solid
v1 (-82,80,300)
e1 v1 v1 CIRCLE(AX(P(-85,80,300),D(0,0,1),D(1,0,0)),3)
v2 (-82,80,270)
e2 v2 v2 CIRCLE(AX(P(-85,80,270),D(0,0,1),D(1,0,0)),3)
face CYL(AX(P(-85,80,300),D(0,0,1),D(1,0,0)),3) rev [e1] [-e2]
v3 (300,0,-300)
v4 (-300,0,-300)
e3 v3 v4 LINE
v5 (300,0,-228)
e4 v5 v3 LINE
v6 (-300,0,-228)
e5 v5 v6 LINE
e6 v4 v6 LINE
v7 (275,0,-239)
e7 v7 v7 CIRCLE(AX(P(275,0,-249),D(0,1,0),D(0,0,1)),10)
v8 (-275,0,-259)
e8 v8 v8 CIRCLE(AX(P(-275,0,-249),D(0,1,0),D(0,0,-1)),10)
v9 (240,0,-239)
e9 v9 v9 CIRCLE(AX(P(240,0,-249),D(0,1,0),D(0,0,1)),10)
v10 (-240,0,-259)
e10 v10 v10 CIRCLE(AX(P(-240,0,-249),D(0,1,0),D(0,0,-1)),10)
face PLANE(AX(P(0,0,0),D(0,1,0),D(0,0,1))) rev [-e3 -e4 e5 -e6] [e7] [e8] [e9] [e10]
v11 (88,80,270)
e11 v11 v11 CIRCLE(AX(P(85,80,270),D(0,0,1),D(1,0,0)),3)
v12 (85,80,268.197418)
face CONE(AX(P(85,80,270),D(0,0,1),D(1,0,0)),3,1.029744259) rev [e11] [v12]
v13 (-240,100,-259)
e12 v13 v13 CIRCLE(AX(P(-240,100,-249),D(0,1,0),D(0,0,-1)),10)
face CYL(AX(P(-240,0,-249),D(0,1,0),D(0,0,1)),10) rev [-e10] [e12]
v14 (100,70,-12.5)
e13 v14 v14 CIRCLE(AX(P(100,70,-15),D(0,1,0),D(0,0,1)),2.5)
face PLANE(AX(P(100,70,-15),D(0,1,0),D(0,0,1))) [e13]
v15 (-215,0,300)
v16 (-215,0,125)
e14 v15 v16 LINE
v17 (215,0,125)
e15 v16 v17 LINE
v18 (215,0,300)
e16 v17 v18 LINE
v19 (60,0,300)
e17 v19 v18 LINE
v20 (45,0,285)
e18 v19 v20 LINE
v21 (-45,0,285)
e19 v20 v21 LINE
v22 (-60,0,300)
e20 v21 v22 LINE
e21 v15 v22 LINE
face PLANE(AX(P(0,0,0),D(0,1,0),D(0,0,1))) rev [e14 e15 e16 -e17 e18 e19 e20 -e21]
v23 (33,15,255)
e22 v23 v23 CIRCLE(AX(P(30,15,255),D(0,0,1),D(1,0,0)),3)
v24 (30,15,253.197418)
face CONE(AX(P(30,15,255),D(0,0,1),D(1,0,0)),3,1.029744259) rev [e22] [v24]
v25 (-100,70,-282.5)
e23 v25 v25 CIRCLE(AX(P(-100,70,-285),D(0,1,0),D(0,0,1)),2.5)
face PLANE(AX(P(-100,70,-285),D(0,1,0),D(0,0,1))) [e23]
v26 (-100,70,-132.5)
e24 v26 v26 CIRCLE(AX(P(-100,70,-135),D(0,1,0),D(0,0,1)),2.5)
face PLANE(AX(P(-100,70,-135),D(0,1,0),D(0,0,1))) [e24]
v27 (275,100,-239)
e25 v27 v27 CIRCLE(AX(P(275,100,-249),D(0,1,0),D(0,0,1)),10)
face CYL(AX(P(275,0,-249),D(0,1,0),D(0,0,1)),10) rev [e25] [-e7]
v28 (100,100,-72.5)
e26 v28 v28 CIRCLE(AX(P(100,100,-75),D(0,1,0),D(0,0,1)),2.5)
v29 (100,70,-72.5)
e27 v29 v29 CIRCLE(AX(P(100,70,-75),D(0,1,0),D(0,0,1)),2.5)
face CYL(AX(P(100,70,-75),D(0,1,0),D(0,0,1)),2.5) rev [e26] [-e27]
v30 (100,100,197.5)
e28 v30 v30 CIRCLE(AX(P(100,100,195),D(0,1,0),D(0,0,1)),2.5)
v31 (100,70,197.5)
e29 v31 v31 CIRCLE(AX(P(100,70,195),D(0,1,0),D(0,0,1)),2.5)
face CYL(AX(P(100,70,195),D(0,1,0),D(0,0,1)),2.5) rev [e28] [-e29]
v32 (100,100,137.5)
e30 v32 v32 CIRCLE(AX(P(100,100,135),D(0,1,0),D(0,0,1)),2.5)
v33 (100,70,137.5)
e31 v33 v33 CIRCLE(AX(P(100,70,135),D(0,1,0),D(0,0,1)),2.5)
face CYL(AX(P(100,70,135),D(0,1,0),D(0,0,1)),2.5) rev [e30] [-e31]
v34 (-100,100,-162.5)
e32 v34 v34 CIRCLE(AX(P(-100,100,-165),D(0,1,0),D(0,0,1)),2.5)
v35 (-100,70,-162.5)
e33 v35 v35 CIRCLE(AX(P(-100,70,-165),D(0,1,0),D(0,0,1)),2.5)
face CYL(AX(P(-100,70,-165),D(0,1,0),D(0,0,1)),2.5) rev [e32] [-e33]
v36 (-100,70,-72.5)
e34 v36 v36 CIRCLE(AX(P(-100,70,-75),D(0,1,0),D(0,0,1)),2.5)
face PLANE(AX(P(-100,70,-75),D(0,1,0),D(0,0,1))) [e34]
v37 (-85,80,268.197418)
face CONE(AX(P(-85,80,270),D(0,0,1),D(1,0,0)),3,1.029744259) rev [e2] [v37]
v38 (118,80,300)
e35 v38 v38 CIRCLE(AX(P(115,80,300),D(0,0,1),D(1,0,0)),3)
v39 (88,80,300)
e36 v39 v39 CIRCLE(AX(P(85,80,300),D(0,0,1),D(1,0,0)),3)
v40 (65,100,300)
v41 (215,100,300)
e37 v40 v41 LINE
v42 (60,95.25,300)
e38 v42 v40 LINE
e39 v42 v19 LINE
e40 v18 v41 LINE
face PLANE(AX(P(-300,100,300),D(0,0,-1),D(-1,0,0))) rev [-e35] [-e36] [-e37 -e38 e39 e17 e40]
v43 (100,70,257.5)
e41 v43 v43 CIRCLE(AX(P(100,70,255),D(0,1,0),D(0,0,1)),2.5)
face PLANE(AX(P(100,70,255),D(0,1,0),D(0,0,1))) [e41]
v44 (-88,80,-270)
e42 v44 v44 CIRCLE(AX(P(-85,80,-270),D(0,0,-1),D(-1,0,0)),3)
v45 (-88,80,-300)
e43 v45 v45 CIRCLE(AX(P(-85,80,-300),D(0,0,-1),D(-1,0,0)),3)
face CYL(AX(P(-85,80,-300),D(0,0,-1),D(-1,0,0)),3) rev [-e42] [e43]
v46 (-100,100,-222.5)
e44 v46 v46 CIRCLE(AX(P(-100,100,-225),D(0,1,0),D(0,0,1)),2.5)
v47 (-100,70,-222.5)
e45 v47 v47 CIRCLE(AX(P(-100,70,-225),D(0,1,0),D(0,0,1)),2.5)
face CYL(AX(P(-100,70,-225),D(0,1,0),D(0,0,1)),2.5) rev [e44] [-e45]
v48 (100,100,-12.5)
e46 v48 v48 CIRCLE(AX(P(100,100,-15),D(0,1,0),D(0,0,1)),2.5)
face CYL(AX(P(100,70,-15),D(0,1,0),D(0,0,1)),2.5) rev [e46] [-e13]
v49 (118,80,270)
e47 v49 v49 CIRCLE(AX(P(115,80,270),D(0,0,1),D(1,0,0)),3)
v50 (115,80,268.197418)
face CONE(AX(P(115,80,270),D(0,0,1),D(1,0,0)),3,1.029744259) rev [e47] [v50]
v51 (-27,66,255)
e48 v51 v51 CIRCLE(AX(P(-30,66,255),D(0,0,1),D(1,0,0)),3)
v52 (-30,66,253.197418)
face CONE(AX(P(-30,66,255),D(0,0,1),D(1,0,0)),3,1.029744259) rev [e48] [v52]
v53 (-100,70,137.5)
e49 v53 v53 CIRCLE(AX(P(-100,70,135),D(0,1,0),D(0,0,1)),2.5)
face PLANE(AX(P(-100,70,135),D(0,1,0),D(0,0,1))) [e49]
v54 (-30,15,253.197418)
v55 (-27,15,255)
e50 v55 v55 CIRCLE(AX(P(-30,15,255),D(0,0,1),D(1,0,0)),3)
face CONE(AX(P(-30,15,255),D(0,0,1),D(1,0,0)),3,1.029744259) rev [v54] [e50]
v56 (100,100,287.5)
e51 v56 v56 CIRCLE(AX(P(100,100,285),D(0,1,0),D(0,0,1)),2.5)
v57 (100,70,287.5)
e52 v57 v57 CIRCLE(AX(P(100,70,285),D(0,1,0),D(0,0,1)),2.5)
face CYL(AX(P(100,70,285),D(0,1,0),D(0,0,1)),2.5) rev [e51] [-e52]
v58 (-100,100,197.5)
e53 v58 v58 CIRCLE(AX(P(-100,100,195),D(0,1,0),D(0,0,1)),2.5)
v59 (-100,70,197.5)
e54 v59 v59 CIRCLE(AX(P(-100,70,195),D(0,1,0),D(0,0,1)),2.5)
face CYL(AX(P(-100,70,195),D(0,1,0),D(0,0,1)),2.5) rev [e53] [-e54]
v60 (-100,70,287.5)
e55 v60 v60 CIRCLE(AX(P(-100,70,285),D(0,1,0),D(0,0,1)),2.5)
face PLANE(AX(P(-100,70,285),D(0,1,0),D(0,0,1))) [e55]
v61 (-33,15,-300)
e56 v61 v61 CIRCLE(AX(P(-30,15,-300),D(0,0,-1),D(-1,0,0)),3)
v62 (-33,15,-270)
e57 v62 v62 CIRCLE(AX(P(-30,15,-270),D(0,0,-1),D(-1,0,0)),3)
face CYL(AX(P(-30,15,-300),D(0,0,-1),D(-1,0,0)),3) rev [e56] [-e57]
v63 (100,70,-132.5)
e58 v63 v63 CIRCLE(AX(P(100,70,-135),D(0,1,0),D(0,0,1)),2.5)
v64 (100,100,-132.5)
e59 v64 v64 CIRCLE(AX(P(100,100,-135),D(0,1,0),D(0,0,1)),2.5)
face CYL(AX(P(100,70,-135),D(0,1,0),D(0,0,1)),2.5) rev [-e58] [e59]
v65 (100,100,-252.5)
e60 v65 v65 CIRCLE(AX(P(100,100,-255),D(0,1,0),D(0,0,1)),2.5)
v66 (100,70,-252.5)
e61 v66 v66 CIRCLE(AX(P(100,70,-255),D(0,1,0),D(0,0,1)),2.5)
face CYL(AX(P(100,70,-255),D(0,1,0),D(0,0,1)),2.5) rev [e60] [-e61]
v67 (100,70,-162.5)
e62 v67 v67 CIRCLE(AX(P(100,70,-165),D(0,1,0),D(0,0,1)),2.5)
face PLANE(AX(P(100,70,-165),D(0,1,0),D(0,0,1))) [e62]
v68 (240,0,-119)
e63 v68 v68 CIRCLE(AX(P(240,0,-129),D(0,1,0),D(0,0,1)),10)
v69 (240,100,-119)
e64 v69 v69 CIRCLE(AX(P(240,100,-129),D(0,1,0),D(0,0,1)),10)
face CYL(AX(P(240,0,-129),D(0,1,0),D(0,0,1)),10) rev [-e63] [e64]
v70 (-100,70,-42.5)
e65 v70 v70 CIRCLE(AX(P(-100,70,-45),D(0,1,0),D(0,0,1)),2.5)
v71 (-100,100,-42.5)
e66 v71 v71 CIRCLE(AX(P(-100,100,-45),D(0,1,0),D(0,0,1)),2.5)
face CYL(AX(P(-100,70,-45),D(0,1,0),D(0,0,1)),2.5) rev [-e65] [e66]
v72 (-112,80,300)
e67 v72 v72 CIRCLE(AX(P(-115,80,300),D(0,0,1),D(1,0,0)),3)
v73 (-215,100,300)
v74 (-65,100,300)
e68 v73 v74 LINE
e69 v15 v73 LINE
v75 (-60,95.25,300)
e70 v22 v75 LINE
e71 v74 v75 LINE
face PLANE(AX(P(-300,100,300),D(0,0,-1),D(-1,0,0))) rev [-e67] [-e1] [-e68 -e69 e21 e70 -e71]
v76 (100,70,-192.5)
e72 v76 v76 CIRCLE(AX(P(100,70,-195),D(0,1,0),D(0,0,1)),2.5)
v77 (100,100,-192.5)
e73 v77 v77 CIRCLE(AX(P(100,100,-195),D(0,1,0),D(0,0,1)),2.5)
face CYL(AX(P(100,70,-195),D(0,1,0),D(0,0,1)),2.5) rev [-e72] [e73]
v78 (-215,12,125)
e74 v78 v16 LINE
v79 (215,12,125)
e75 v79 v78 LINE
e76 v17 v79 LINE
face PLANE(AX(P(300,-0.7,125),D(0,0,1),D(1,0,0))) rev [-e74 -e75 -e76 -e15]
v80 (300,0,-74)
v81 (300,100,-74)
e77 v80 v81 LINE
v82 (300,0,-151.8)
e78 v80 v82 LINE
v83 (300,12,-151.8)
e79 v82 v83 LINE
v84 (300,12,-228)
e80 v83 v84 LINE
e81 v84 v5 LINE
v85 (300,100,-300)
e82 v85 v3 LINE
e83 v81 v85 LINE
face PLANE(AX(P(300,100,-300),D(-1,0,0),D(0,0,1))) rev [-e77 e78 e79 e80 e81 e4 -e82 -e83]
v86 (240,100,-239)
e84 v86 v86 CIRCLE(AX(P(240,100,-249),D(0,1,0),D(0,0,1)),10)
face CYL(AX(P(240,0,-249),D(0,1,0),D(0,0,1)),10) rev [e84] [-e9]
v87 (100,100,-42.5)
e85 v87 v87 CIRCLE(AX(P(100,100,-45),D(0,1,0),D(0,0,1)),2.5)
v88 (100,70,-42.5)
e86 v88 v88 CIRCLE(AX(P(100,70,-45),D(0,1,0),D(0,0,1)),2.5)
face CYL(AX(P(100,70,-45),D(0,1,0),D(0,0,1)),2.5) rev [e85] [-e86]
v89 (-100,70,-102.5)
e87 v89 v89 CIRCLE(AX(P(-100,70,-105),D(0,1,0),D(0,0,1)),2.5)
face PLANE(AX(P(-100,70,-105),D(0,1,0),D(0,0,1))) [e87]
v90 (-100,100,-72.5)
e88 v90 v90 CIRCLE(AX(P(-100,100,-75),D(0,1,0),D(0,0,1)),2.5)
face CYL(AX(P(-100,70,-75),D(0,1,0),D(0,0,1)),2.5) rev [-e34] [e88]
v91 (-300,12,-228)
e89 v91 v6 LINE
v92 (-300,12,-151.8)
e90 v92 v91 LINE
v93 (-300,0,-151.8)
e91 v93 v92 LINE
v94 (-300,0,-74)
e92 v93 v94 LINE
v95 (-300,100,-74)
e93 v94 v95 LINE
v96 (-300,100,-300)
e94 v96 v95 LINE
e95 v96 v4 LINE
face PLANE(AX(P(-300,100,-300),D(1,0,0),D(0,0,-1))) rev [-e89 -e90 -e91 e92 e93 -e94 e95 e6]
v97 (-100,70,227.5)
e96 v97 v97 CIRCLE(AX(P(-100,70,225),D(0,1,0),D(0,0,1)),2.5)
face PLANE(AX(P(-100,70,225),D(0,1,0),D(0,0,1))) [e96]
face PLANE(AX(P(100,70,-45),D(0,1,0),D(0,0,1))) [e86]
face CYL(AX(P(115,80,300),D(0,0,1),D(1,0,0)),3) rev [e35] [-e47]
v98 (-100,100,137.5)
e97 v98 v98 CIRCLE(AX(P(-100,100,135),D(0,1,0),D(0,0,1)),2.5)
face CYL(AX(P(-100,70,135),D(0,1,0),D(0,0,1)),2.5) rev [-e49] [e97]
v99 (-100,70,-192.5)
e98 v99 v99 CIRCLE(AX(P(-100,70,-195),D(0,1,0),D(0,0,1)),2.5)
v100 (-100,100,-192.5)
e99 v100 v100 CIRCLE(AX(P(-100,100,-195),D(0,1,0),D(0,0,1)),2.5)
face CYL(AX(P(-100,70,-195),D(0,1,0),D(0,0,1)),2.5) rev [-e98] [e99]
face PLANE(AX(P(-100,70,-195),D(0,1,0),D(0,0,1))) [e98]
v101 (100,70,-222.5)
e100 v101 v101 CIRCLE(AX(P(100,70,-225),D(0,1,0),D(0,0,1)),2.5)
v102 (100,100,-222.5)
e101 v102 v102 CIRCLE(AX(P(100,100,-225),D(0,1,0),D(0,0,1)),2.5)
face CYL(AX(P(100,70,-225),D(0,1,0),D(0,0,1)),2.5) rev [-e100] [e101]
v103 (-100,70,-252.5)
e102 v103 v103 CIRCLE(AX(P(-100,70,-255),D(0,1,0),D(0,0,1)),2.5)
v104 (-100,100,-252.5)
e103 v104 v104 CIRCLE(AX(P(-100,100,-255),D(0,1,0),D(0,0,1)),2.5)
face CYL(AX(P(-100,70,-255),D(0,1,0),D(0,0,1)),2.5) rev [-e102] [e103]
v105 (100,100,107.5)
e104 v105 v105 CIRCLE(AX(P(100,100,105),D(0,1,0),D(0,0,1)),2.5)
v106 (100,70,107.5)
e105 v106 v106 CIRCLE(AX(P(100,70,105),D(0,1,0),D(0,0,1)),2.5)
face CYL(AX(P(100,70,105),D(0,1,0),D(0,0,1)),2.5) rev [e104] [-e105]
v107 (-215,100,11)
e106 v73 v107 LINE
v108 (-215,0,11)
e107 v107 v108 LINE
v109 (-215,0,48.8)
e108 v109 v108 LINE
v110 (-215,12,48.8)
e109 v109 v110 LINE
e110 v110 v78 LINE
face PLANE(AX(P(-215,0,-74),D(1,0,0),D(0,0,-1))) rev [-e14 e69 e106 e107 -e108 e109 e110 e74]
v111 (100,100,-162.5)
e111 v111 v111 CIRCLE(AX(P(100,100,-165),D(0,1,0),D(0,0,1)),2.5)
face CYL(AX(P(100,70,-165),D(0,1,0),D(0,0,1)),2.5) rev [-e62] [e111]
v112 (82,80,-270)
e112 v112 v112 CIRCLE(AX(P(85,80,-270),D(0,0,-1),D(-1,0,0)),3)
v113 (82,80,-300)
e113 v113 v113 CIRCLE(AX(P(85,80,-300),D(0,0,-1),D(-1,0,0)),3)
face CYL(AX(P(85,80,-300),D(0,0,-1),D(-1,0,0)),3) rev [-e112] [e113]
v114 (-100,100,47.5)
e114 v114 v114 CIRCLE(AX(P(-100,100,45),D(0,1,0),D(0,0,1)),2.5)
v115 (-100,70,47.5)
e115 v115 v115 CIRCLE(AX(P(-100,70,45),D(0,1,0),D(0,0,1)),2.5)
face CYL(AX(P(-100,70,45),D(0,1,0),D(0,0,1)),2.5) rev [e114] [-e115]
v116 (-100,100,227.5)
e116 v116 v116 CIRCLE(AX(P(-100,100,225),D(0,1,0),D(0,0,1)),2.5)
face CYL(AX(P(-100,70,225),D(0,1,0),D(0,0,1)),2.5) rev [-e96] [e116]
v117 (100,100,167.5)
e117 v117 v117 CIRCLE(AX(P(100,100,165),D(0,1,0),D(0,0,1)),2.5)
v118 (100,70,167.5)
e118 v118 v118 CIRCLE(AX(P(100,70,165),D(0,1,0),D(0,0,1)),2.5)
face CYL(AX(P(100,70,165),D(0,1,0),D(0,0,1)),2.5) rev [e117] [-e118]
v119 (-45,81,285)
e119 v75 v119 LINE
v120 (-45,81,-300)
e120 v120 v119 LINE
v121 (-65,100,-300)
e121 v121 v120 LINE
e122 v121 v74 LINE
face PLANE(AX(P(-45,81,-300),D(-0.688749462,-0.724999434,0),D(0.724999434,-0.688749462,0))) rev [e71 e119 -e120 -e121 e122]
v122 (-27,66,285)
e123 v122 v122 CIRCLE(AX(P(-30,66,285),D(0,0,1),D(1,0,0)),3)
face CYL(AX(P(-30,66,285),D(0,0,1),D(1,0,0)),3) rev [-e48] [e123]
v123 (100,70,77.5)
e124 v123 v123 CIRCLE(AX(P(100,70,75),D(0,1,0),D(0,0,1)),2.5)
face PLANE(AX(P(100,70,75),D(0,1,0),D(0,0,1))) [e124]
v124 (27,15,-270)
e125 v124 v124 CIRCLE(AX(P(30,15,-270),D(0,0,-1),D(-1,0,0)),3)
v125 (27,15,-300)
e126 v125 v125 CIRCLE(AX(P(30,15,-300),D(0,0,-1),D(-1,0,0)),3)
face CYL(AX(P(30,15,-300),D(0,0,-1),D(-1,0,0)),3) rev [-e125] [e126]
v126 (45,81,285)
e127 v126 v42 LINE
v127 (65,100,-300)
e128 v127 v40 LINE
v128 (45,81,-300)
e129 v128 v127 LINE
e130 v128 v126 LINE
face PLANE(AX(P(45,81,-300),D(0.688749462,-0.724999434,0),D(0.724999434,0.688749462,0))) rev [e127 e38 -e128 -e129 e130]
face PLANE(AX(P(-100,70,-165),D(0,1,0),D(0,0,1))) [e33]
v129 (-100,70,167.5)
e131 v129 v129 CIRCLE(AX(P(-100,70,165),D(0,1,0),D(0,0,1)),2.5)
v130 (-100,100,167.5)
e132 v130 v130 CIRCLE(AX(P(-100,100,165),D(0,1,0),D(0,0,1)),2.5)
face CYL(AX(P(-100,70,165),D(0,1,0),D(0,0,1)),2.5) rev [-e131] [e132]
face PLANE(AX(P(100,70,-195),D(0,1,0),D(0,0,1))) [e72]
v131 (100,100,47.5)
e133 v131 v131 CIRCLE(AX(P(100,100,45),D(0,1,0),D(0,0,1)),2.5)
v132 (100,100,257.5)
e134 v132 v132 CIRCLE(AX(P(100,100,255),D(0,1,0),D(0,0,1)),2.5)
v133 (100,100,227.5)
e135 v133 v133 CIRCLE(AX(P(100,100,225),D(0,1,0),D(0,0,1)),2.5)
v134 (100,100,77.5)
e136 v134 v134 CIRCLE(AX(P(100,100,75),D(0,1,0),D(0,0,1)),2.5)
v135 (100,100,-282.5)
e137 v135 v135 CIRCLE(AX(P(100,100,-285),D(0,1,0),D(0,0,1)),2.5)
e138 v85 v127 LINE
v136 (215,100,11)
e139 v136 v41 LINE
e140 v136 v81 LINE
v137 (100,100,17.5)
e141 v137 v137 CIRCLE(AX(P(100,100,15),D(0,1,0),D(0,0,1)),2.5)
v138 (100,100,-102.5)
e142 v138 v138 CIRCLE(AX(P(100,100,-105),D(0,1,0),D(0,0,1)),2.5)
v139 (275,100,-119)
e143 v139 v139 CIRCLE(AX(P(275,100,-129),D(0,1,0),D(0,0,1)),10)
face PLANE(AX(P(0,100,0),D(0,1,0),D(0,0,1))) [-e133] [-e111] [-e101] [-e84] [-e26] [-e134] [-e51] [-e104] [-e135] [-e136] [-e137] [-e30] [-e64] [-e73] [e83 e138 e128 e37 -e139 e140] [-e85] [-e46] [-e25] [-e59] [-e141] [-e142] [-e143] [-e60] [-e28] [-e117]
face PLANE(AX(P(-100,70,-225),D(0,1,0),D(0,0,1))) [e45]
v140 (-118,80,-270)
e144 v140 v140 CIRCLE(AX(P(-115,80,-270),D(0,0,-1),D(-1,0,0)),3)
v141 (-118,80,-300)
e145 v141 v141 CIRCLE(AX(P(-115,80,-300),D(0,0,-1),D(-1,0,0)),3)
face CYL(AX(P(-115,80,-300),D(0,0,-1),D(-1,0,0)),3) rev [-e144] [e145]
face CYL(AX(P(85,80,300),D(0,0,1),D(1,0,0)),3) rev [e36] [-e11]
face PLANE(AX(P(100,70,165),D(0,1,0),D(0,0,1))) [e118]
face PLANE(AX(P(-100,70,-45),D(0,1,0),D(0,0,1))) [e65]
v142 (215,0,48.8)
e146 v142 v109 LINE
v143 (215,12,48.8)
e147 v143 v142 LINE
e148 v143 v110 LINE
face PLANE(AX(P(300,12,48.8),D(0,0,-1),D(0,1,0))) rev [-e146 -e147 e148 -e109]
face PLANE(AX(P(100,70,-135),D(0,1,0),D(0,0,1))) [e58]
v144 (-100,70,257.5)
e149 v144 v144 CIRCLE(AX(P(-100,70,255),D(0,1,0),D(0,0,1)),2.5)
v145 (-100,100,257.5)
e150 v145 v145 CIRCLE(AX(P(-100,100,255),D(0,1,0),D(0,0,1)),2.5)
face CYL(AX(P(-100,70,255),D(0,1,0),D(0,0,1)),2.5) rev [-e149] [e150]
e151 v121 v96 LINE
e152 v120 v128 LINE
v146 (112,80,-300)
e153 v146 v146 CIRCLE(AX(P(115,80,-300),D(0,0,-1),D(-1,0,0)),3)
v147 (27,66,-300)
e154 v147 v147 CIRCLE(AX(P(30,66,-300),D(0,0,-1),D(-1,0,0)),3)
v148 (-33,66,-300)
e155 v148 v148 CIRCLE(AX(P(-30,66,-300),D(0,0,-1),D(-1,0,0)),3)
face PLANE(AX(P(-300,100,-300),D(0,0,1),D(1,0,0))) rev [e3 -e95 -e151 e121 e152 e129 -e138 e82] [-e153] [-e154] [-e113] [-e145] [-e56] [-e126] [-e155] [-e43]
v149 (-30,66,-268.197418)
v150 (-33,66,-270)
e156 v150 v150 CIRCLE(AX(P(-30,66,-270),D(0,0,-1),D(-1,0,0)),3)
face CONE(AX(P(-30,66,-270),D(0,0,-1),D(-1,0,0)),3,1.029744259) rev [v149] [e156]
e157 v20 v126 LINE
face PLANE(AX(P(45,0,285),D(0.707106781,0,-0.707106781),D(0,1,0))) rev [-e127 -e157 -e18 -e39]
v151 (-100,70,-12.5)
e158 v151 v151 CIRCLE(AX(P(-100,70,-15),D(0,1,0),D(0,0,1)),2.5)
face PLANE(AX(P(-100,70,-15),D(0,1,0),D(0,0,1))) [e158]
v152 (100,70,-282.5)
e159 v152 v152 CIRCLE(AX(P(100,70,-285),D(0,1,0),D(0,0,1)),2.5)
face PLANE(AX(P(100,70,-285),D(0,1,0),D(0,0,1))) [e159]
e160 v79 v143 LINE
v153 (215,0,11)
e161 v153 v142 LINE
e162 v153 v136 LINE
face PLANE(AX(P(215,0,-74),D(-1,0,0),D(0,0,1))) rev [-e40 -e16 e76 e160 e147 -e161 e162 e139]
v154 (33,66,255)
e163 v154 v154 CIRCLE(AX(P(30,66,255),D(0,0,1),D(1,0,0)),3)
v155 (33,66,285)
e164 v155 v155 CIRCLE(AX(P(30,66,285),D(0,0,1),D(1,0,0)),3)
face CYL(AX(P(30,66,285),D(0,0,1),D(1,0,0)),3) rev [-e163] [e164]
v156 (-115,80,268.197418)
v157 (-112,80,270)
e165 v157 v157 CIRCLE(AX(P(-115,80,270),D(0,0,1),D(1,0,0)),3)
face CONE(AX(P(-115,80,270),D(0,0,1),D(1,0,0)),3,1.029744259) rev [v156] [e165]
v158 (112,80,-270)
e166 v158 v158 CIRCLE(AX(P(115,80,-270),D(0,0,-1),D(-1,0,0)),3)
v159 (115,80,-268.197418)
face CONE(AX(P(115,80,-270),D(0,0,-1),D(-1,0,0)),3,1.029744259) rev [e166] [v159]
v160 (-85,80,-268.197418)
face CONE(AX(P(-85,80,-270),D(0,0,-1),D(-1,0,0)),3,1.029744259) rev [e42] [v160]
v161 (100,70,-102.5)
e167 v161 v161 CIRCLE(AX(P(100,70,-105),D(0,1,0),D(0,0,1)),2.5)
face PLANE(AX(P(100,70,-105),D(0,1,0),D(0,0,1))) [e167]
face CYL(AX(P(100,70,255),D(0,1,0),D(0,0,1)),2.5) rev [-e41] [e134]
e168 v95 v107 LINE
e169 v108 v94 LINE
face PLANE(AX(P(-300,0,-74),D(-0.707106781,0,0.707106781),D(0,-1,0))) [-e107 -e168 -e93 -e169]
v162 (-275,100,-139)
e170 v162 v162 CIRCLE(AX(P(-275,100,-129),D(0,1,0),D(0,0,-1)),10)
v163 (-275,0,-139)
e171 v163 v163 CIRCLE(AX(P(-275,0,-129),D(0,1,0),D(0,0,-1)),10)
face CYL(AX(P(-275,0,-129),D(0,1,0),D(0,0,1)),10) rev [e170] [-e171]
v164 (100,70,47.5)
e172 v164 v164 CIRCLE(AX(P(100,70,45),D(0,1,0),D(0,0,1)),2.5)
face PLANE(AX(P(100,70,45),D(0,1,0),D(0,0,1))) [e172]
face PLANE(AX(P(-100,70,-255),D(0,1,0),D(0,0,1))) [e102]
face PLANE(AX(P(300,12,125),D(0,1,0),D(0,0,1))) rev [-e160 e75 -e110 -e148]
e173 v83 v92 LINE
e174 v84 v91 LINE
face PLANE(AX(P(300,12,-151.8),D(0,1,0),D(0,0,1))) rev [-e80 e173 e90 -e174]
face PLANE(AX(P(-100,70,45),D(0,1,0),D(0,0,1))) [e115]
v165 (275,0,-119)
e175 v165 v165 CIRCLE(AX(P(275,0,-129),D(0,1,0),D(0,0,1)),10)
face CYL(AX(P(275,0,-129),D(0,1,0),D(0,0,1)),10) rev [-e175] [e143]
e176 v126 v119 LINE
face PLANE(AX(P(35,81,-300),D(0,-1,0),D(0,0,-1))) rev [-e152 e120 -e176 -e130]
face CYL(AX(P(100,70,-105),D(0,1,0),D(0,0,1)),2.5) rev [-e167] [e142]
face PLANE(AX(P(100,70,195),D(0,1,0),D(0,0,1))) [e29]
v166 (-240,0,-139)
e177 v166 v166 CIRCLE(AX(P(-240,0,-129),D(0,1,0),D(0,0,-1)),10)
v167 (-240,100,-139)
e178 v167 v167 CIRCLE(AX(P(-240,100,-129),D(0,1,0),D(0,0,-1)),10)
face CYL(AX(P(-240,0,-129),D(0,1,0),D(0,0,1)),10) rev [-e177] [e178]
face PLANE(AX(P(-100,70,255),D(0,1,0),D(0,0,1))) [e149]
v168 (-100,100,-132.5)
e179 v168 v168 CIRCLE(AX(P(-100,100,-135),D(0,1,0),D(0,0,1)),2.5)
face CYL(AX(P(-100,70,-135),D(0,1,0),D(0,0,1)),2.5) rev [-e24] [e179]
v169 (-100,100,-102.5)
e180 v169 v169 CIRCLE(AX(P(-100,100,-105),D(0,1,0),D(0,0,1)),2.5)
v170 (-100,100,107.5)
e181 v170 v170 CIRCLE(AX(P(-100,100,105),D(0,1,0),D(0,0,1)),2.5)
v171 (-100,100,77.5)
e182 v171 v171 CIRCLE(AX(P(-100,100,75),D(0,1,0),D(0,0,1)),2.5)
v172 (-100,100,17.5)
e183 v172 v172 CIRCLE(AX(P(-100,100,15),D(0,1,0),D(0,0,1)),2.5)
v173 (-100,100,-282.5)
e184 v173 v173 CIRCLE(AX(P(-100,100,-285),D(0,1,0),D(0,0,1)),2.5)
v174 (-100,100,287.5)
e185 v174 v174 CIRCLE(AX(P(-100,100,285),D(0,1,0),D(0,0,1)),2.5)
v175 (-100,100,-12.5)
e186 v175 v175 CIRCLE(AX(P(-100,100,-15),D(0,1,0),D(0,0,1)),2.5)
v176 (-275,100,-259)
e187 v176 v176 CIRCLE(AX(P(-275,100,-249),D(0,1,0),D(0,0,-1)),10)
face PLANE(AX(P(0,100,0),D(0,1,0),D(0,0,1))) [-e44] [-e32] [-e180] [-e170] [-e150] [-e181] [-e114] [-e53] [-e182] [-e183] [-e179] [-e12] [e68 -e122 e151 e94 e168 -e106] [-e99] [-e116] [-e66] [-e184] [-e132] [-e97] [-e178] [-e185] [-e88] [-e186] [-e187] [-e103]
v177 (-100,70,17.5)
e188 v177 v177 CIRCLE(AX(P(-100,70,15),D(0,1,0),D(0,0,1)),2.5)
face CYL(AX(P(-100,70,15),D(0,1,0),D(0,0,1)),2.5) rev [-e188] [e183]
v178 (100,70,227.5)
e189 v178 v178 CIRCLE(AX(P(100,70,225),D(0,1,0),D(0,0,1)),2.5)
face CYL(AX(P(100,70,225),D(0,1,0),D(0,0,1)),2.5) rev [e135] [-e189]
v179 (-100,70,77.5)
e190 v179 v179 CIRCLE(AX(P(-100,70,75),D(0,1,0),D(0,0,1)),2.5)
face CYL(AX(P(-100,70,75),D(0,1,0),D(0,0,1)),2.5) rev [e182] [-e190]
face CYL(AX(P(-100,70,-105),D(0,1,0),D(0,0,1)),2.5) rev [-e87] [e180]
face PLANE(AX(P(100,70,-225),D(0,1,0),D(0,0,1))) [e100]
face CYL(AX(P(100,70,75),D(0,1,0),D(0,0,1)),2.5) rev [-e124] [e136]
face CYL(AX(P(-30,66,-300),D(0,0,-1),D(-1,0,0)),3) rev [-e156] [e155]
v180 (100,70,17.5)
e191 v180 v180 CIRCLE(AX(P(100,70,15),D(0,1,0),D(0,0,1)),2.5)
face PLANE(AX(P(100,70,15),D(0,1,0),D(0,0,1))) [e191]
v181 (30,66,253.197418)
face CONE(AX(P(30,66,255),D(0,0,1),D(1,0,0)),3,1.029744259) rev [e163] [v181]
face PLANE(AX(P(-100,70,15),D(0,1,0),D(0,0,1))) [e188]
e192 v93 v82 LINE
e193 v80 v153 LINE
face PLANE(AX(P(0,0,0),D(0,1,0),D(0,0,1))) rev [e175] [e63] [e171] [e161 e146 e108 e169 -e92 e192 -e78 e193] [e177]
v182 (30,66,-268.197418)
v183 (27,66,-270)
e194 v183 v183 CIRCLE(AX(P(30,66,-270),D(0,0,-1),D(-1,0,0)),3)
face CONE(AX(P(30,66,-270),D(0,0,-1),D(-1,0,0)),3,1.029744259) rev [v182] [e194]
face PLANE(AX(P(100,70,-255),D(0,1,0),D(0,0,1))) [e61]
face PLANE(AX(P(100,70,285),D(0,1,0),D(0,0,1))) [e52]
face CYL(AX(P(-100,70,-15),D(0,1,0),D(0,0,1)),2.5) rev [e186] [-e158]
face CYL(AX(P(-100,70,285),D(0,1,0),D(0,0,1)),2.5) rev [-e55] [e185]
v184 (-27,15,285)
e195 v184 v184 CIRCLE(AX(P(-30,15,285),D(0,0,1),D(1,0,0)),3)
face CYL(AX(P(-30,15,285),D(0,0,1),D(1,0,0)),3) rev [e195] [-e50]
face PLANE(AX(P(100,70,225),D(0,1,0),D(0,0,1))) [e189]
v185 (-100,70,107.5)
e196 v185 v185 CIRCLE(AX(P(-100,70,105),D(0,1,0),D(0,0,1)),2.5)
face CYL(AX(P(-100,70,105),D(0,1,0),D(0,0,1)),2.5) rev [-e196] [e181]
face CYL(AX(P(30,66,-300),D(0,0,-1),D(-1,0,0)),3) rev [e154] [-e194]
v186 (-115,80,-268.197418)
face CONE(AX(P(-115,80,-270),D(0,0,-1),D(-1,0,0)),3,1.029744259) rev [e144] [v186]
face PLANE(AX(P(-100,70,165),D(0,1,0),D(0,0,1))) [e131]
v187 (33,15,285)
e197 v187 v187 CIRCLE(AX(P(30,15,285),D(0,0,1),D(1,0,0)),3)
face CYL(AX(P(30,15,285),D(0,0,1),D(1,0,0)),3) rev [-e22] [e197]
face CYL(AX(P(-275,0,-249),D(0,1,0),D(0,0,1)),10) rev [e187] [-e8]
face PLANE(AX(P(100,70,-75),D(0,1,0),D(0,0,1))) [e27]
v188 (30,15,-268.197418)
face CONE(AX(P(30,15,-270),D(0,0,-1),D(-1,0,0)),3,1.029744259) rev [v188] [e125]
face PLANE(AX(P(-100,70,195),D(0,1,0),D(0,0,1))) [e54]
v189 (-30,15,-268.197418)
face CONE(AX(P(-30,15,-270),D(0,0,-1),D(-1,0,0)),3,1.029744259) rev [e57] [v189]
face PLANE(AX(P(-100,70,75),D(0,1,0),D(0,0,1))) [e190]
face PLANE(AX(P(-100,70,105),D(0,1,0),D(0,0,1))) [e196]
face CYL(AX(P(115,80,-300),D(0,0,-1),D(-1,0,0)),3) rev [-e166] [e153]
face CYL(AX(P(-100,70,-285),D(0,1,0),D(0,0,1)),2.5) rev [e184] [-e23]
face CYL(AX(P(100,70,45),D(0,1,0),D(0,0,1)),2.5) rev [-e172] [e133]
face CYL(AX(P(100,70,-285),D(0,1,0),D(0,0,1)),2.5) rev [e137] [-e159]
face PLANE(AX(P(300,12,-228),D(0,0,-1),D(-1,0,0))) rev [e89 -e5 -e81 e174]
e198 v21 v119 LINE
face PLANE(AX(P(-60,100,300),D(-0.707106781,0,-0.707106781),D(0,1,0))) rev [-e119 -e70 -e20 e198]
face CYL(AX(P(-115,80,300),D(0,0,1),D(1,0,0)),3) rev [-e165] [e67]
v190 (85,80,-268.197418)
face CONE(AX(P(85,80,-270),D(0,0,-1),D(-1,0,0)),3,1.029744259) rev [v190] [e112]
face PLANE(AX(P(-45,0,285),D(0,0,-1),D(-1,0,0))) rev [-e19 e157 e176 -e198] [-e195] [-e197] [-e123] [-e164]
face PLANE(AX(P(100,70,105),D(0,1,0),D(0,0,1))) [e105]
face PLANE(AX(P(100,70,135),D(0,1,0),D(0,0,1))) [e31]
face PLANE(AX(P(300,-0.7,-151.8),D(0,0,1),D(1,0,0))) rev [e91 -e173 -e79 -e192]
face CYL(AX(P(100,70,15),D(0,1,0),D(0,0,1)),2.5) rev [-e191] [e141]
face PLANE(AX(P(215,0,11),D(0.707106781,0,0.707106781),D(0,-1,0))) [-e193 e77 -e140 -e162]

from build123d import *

# Parameters (mm, degrees)
SKETCH1_W                           = 600
SKETCH1_H                           = 600
BOSS_EXTRUDE1_DEPTH                 = 100
CUT_EXTRUDE1_DEPTH                  = 436.889894354
CHAMFER5_SIZE                       = 85
CUT_EXTRUDE2_DEPTH                  = 679.232998313
SKETCH9_R                           = 10
CUT_EXTRUDE5_DEPTH                  = 436.889894354
SKETCH12_R                          = 2.5
CUT_EXTRUDE7_DEPTH                  = 30
SKETCH14_W                          = 90
SKETCH14_H                          = 15
CUT_EXTRUDE8_DEPTH                  = 432.927077179
CHAMFER3_SIZE                       = 15
SKETCH15_W                          = 76.2
SKETCH15_H                          = 12.7
CUT_EXTRUDE9_DEPTH                  = 679.232998313
F_6_0MM_DOWEL_HOLE1_D               = 6
F_6_0MM_DOWEL_HOLE1_DEPTH           = 30
F_6_0MM_DOWEL_HOLE1_TIP             = 1.802581857
F_6_0MM_DOWEL_HOLE1_ON_FACE_2_D     = 6
F_6_0MM_DOWEL_HOLE1_ON_FACE_2_DEPTH = 30
F_6_0MM_DOWEL_HOLE1_ON_FACE_2_TIP   = 1.802581857
F_6_0MM_DOWEL_HOLE1_ON_FACE_3_D     = 6
F_6_0MM_DOWEL_HOLE1_ON_FACE_3_DEPTH = 30
F_6_0MM_DOWEL_HOLE1_ON_FACE_3_TIP   = 1.802581857


with BuildPart() as part:
    # Sketch1 → Boss-Extrude1 (new body)
    with BuildSketch(Plane(origin=(0, 0, 0), x_dir=(1, 0, 0), z_dir=(0, 1, 0))):
        Rectangle(SKETCH1_W, SKETCH1_H)
    extrude(amount=BOSS_EXTRUDE1_DEPTH)

    # Sketch2 → Cut-Extrude1 (cut, through all)
    with BuildSketch(Plane(origin=(0, 100, 0), x_dir=(1, 0, 0), z_dir=(0, 1, 0))):
        Polygon((-300, -300), (-220, -300), (-215, -300), (-215, 74), (-220, 74), (-300, 74), (-300, 60), align=None)
        Polygon((300, -300), (220, -300), (215, -300), (215, 74), (220, 74), (300, 74), (300, 60), align=None)
    extrude(amount=-CUT_EXTRUDE1_DEPTH, mode=Mode.SUBTRACT)

    # Chamfer5
    chamfer5_edges = [part.edges().sort_by_distance(p)[0] for p in [
        (-215, 50, -74),
        (215, 50, -74),
    ]]
    chamfer(chamfer5_edges, length=CHAMFER5_SIZE - 0.0001)  # a hair under: the kernel refuses the full size

    # Sketch3 → Cut-Extrude2 (cut, through all)
    with BuildSketch(Plane.XY.offset(300)):
        Polygon((-35, 81), (-45, 81), (-65, 100), (-45, 100), (45, 100), (65, 100), (45, 81), (35, 81), (0, 81), align=None)
    extrude(amount=-CUT_EXTRUDE2_DEPTH, mode=Mode.SUBTRACT)

    # Sketch9 → Cut-Extrude5 (cut, through all)
    with BuildSketch(Plane(origin=(0, 100, 0), x_dir=(1, 0, 0), z_dir=(0, 1, 0))):
        with Locations(Location((275, 129, 0), (0, 0, 270))):
            Circle(SKETCH9_R)
        with Locations(Location((240, 129, 0), (0, 0, 270))):
            Circle(SKETCH9_R)
        with Locations(Location((240, 249, 0), (0, 0, 270))):
            Circle(SKETCH9_R)
        with Locations(Location((275, 249, 0), (0, 0, 270))):
            Circle(SKETCH9_R)
        with Locations(Location((-275, 129, 0), (0, 0, 90))):
            Circle(SKETCH9_R)
        with Locations(Location((-240, 249, 0), (0, 0, 90))):
            Circle(SKETCH9_R)
        with Locations(Location((-275, 249, 0), (0, 0, 90))):
            Circle(SKETCH9_R)
        with Locations(Location((-240, 129, 0), (0, 0, 90))):
            Circle(SKETCH9_R)
    extrude(amount=-CUT_EXTRUDE5_DEPTH, mode=Mode.SUBTRACT)

    # Sketch12 → Cut-Extrude7 (cut)
    with BuildSketch(Plane(origin=(0, 100, 0), x_dir=(1, 0, 0), z_dir=(0, 1, 0))):
        with Locations(Location((-100, -285, 0), (0, 0, 270))):
            Circle(SKETCH12_R)
        with Locations(Location((100, -285, 0), (0, 0, 270))):
            Circle(SKETCH12_R)
        with Locations(Location((100, -255, 0), (0, 0, 270))):
            Circle(SKETCH12_R)
        with Locations(Location((100, -225, 0), (0, 0, 270))):
            Circle(SKETCH12_R)
        with Locations(Location((100, -195, 0), (0, 0, 270))):
            Circle(SKETCH12_R)
        with Locations(Location((100, -165, 0), (0, 0, 270))):
            Circle(SKETCH12_R)
        with Locations(Location((100, -135, 0), (0, 0, 270))):
            Circle(SKETCH12_R)
        with Locations(Location((100, -105, 0), (0, 0, 270))):
            Circle(SKETCH12_R)
        with Locations(Location((100, -75, 0), (0, 0, 270))):
            Circle(SKETCH12_R)
        with Locations(Location((100, -45, 0), (0, 0, 270))):
            Circle(SKETCH12_R)
        with Locations(Location((100, -15, 0), (0, 0, 270))):
            Circle(SKETCH12_R)
        with Locations(Location((100, 15, 0), (0, 0, 270))):
            Circle(SKETCH12_R)
        with Locations(Location((100, 45, 0), (0, 0, 270))):
            Circle(SKETCH12_R)
        with Locations(Location((100, 75, 0), (0, 0, 270))):
            Circle(SKETCH12_R)
        with Locations(Location((100, 105, 0), (0, 0, 270))):
            Circle(SKETCH12_R)
        with Locations(Location((100, 135, 0), (0, 0, 270))):
            Circle(SKETCH12_R)
        with Locations(Location((100, 165, 0), (0, 0, 270))):
            Circle(SKETCH12_R)
        with Locations(Location((100, 195, 0), (0, 0, 270))):
            Circle(SKETCH12_R)
        with Locations(Location((100, 225, 0), (0, 0, 270))):
            Circle(SKETCH12_R)
        with Locations(Location((100, 255, 0), (0, 0, 270))):
            Circle(SKETCH12_R)
        with Locations(Location((100, 285, 0), (0, 0, 270))):
            Circle(SKETCH12_R)
        with Locations(Location((-100, -255, 0), (0, 0, 270))):
            Circle(SKETCH12_R)
        with Locations(Location((-100, -225, 0), (0, 0, 270))):
            Circle(SKETCH12_R)
        with Locations(Location((-100, -195, 0), (0, 0, 270))):
            Circle(SKETCH12_R)
        with Locations(Location((-100, -165, 0), (0, 0, 270))):
            Circle(SKETCH12_R)
        with Locations(Location((-100, -135, 0), (0, 0, 270))):
            Circle(SKETCH12_R)
        with Locations(Location((-100, -105, 0), (0, 0, 270))):
            Circle(SKETCH12_R)
        with Locations(Location((-100, -75, 0), (0, 0, 270))):
            Circle(SKETCH12_R)
        with Locations(Location((-100, -45, 0), (0, 0, 270))):
            Circle(SKETCH12_R)
        with Locations(Location((-100, -15, 0), (0, 0, 270))):
            Circle(SKETCH12_R)
        with Locations(Location((-100, 15, 0), (0, 0, 270))):
            Circle(SKETCH12_R)
        with Locations(Location((-100, 45, 0), (0, 0, 270))):
            Circle(SKETCH12_R)
        with Locations(Location((-100, 75, 0), (0, 0, 270))):
            Circle(SKETCH12_R)
        with Locations(Location((-100, 105, 0), (0, 0, 270))):
            Circle(SKETCH12_R)
        with Locations(Location((-100, 135, 0), (0, 0, 270))):
            Circle(SKETCH12_R)
        with Locations(Location((-100, 165, 0), (0, 0, 270))):
            Circle(SKETCH12_R)
        with Locations(Location((-100, 195, 0), (0, 0, 270))):
            Circle(SKETCH12_R)
        with Locations(Location((-100, 225, 0), (0, 0, 270))):
            Circle(SKETCH12_R)
        with Locations(Location((-100, 255, 0), (0, 0, 270))):
            Circle(SKETCH12_R)
        with Locations(Location((-100, 285, 0), (0, 0, 270))):
            Circle(SKETCH12_R)
    extrude(amount=-CUT_EXTRUDE7_DEPTH, mode=Mode.SUBTRACT)

    # Sketch14 → Cut-Extrude8 (cut, through all)
    with BuildSketch(Plane(origin=(0, 81, 0), x_dir=(1, 0, 0), z_dir=(0, 1, 0))):
        with Locations((0, -292.5)):
            Rectangle(SKETCH14_W, SKETCH14_H)
    extrude(amount=-CUT_EXTRUDE8_DEPTH, mode=Mode.SUBTRACT)

    # Chamfer3
    chamfer3_edges = [part.edges().sort_by_distance(p)[0] for p in [
        (45, 40.5, 300),
        (-45, 40.5, 300),
    ]]
    chamfer(chamfer3_edges, length=CHAMFER3_SIZE - 0.0001)  # a hair under: the kernel refuses the full size

    # Sketch15 → Cut-Extrude9 (cut, through all)
    with BuildSketch(Plane.ZY.offset(300)):
        with Locations((86.9, 5.65)):
            Rectangle(SKETCH15_W, SKETCH15_H)
        with Locations((-189.9, 5.65)):
            Rectangle(SKETCH15_W, SKETCH15_H)
    extrude(amount=-CUT_EXTRUDE9_DEPTH, mode=Mode.SUBTRACT)

    # Ø6.0mm Dowel Hole1
    with Locations(Plane(origin=(-30, 66, 285), x_dir=(1, 0, 0), z_dir=(0, 0, 1))):
        with Locations((0, 0), (60, 0), (60, -51), (0, -51)):
            Hole(F_6_0MM_DOWEL_HOLE1_D / 2, depth=F_6_0MM_DOWEL_HOLE1_DEPTH)
            with Locations((0, 0, -(F_6_0MM_DOWEL_HOLE1_DEPTH + F_6_0MM_DOWEL_HOLE1_TIP / 2))):  # 118° drill point
                Cone(0, F_6_0MM_DOWEL_HOLE1_D / 2, F_6_0MM_DOWEL_HOLE1_TIP, mode=Mode.SUBTRACT)

    # Ø6.0mm Dowel Hole1 on face 2
    with Locations(Plane(origin=(30, 66, -300), x_dir=(-1, 0, 0), z_dir=(0, 0, -1))):
        with Locations((0, 0), (60, 0), (60, -51), (0, -51), (145, 14), (115, 14), (-55, 14), (-85, 14)):
            Hole(F_6_0MM_DOWEL_HOLE1_ON_FACE_2_D / 2, depth=F_6_0MM_DOWEL_HOLE1_ON_FACE_2_DEPTH)
            with Locations((0, 0, -(F_6_0MM_DOWEL_HOLE1_ON_FACE_2_DEPTH + F_6_0MM_DOWEL_HOLE1_ON_FACE_2_TIP / 2))):  # 118° drill point
                Cone(0, F_6_0MM_DOWEL_HOLE1_ON_FACE_2_D / 2, F_6_0MM_DOWEL_HOLE1_ON_FACE_2_TIP, mode=Mode.SUBTRACT)

    # Ø6.0mm Dowel Hole1 on face 3
    with Locations(Plane(origin=(-85, 80, 300), x_dir=(1, 0, 0), z_dir=(0, 0, 1))):
        with Locations((0, 0), (-30, 0), (170, 0), (200, 0)):
            Hole(F_6_0MM_DOWEL_HOLE1_ON_FACE_3_D / 2, depth=F_6_0MM_DOWEL_HOLE1_ON_FACE_3_DEPTH)
            with Locations((0, 0, -(F_6_0MM_DOWEL_HOLE1_ON_FACE_3_DEPTH + F_6_0MM_DOWEL_HOLE1_ON_FACE_3_TIP / 2))):  # 118° drill point
                Cone(0, F_6_0MM_DOWEL_HOLE1_ON_FACE_3_D / 2, F_6_0MM_DOWEL_HOLE1_ON_FACE_3_TIP, mode=Mode.SUBTRACT)


solid = part.part
